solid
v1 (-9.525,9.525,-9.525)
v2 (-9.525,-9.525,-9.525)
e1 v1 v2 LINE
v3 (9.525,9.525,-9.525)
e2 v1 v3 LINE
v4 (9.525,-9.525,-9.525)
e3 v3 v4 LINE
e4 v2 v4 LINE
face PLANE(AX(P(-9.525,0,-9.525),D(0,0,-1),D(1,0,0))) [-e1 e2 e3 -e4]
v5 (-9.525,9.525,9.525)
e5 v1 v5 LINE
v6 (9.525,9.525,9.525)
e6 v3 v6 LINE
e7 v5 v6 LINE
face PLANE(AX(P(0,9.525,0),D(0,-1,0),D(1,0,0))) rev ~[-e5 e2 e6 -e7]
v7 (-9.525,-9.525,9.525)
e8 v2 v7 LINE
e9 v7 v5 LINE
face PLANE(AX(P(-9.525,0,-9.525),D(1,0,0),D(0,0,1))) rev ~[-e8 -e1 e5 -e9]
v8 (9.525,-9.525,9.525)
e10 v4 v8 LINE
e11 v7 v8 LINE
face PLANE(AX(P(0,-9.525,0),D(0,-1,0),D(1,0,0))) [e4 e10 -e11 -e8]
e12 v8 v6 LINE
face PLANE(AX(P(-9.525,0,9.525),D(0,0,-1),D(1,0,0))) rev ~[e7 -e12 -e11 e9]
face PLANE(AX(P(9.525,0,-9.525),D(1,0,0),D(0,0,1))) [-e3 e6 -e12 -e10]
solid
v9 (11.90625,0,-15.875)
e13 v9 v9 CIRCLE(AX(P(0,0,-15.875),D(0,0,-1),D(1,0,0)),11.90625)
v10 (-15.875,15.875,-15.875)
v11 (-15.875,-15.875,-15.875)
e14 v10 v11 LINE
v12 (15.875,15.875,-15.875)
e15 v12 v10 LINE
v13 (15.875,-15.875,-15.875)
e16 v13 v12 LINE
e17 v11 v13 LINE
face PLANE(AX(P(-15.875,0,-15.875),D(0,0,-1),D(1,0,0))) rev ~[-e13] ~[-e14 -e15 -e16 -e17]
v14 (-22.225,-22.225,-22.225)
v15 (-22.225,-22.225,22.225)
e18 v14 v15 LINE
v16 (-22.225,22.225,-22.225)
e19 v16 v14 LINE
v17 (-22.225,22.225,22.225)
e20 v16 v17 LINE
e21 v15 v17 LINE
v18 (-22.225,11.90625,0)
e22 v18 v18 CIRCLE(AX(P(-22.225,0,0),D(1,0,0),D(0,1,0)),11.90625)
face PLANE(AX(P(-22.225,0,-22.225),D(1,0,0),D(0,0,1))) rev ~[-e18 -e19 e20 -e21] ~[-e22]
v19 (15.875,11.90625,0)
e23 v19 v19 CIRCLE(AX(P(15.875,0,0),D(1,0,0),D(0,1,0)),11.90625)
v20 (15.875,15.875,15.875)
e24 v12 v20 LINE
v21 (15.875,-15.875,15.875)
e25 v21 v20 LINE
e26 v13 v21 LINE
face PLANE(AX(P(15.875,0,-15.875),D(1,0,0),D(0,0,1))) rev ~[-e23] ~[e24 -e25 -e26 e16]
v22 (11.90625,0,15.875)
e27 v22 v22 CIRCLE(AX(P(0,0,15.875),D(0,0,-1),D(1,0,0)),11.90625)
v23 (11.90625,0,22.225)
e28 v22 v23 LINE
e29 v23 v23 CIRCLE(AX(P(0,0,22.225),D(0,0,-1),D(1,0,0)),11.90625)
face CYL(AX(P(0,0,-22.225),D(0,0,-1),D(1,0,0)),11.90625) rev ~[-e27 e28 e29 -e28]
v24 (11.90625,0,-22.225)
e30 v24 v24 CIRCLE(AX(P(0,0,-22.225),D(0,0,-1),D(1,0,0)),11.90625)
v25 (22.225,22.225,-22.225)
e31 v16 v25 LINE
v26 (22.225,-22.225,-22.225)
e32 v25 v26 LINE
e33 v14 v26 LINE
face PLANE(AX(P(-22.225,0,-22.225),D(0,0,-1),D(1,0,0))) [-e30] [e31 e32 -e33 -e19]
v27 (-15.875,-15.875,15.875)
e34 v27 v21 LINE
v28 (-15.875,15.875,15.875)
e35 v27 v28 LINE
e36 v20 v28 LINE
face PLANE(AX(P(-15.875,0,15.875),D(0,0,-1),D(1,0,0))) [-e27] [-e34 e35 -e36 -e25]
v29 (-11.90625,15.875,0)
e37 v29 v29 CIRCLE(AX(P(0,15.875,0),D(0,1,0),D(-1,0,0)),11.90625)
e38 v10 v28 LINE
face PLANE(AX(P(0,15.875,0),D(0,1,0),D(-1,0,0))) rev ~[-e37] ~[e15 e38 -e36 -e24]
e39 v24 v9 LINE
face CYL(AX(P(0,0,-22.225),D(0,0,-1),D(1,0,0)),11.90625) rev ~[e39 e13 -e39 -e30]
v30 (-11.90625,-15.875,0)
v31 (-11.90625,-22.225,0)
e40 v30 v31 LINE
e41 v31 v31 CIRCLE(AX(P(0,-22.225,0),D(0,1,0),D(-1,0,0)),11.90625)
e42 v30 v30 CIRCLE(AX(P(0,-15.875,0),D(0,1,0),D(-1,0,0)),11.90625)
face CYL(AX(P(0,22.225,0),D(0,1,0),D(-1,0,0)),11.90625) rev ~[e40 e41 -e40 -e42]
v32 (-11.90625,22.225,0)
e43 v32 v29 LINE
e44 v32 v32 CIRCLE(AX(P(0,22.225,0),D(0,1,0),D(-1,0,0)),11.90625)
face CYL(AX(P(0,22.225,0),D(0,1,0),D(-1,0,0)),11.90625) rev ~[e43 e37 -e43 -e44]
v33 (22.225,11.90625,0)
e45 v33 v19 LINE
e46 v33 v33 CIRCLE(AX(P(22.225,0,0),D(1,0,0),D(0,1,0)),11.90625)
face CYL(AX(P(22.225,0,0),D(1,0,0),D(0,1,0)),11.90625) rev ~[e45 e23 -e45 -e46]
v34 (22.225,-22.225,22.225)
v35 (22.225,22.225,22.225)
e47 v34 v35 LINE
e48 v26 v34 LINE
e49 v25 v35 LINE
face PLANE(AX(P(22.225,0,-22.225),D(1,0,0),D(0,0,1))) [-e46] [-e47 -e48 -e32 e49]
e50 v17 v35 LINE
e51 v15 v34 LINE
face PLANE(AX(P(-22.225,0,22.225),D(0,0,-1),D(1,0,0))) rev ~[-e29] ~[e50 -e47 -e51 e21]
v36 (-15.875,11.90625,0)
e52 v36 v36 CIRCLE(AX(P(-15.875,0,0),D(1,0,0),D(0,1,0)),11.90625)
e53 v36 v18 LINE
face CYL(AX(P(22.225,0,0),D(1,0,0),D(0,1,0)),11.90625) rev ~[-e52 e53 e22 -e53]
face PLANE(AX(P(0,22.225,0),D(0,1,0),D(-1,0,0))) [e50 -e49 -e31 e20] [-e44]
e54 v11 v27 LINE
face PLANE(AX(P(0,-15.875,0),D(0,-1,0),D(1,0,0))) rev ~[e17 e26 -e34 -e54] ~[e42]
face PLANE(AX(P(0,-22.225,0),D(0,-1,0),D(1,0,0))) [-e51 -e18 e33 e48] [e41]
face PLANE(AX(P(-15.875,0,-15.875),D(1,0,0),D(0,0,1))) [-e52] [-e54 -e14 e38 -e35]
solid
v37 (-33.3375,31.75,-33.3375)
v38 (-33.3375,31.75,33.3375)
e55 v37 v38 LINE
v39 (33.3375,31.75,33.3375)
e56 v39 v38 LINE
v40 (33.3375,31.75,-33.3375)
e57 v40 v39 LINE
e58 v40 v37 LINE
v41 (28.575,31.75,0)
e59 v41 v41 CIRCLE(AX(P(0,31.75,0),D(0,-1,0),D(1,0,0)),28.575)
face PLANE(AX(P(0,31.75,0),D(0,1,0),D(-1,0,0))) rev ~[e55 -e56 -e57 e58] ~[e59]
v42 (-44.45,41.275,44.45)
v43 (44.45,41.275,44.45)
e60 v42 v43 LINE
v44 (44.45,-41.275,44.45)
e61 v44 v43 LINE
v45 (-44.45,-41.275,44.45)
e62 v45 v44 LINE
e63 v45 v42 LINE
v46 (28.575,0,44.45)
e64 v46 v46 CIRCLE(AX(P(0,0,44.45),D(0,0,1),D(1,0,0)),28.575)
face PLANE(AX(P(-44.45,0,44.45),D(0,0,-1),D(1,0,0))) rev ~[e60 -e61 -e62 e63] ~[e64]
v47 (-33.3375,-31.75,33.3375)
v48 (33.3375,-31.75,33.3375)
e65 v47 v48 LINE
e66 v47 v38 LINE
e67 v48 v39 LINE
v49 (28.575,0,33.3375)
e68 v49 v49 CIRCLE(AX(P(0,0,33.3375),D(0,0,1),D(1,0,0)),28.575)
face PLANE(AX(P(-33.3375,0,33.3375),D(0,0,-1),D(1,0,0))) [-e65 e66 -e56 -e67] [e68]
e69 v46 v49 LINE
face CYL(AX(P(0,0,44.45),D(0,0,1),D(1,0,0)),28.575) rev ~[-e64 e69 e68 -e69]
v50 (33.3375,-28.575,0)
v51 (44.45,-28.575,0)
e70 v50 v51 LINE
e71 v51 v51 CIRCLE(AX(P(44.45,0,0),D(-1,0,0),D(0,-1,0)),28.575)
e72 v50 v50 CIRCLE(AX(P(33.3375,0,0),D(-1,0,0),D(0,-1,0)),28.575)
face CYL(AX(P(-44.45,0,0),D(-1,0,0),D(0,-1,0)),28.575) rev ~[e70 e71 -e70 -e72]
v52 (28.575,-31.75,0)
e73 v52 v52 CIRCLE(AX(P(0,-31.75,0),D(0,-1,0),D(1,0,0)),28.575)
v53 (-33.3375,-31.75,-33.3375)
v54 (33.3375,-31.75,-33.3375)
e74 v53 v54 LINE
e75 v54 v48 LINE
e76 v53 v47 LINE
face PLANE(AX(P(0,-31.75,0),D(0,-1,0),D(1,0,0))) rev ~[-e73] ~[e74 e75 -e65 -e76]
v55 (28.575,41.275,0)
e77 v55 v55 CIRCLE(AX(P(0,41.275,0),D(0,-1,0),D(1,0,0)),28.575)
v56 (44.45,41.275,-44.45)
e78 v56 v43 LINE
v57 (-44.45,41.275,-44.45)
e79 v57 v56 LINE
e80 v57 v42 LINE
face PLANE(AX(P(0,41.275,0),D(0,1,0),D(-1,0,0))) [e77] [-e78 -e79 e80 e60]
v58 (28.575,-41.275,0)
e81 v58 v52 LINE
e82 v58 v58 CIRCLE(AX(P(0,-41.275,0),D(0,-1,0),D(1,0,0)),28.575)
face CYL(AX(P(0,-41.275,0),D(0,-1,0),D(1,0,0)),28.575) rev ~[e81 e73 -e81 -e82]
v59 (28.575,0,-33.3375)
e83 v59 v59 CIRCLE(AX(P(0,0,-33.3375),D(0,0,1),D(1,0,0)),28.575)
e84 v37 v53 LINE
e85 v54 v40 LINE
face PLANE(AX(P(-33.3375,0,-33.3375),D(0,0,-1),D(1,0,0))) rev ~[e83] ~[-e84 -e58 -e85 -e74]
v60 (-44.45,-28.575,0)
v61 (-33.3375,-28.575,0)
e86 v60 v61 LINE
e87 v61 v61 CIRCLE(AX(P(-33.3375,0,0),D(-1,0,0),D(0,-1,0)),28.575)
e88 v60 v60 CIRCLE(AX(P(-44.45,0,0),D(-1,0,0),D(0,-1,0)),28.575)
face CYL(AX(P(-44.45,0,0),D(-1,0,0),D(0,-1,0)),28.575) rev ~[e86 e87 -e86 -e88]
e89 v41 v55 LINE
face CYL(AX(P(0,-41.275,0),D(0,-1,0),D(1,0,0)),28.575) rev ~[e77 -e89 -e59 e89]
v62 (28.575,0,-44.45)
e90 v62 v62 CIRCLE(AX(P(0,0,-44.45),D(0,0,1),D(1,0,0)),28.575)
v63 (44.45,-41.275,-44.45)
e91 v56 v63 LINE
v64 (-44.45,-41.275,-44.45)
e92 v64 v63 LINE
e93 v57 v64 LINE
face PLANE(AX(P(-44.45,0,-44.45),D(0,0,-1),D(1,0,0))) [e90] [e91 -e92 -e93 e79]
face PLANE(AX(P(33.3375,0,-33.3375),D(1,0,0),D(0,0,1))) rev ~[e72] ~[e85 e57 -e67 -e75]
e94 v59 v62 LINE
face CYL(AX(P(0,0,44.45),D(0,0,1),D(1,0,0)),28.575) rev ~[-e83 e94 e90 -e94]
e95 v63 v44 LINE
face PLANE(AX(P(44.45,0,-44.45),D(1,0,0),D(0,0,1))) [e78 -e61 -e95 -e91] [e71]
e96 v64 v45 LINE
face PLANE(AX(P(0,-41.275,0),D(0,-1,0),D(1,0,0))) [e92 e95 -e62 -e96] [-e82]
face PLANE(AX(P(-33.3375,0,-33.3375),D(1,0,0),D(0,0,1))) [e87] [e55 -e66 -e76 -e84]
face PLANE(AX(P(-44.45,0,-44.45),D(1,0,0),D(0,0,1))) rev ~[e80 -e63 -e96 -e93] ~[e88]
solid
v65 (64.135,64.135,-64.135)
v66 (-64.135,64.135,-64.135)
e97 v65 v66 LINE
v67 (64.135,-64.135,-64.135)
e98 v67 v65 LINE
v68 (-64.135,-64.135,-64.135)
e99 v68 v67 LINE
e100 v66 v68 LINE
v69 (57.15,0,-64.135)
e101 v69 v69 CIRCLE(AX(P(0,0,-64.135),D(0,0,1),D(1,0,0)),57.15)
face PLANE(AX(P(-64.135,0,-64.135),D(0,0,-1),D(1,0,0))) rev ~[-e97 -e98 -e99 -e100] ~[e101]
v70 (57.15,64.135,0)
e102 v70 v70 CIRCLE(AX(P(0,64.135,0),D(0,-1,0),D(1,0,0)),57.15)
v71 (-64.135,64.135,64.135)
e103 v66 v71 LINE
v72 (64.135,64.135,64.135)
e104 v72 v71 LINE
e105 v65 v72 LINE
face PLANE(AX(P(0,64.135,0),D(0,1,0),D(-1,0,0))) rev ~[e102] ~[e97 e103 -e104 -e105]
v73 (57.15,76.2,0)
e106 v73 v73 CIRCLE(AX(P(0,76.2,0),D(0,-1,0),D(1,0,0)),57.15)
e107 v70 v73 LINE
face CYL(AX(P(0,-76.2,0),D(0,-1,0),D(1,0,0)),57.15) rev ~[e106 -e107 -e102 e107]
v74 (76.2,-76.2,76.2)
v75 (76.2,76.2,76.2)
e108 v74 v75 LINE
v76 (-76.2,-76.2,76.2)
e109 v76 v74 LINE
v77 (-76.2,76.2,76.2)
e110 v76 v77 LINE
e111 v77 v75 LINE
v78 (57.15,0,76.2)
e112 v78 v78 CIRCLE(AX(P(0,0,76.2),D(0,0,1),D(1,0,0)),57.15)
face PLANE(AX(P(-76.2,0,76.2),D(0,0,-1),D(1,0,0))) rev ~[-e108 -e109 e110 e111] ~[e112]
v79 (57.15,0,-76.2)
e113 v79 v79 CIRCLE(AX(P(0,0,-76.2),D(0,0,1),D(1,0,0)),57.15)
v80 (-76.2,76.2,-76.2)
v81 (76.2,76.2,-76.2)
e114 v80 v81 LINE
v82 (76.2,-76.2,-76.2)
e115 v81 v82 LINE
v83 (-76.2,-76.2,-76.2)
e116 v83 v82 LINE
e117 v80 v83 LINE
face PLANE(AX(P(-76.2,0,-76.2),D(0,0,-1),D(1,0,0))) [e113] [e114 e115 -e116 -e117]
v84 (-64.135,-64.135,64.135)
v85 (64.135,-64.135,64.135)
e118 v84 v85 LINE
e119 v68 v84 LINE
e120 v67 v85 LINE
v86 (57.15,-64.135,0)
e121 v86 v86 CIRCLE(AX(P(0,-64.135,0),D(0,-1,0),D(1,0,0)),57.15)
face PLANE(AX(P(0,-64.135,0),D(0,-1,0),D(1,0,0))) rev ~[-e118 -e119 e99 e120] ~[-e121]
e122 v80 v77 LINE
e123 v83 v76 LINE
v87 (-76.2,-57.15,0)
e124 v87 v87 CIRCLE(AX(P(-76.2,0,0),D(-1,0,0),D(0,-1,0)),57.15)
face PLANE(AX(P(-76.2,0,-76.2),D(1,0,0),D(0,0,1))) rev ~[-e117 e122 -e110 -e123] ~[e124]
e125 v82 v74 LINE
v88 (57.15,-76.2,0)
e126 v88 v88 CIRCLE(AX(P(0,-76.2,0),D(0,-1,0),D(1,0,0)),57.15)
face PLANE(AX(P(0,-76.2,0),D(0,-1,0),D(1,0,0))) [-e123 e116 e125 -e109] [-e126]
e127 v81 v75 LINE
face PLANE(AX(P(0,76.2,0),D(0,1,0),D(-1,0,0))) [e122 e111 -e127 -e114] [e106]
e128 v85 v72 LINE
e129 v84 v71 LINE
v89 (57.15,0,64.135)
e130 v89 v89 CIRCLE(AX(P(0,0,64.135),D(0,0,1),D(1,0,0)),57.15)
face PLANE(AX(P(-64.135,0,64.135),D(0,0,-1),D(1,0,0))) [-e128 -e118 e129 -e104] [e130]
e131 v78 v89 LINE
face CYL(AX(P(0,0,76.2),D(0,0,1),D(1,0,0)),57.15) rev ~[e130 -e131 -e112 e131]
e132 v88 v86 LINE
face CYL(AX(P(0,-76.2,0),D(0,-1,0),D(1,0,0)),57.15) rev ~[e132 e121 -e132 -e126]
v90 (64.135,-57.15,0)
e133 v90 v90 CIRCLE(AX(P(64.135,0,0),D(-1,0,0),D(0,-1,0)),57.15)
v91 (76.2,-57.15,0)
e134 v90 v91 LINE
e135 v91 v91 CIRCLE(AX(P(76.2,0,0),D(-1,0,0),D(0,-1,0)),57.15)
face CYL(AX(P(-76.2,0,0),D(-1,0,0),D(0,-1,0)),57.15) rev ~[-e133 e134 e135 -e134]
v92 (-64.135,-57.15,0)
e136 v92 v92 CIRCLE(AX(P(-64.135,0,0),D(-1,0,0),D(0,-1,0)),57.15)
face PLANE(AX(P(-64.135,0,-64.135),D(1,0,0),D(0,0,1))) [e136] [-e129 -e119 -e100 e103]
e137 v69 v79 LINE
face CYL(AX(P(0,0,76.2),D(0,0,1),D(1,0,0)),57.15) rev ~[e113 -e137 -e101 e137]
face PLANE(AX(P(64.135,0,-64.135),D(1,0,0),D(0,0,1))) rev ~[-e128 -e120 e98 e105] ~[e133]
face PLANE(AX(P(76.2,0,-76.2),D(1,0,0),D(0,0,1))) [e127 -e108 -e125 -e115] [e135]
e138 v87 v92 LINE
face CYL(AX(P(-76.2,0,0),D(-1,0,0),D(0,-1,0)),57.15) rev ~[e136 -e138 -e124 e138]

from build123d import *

# Parameters (mm, degrees)
F0_W      = 19.05
F0_H      = 19.05
F1_DEPTH  = 9.525
F2_W      = 44.45
F2_H      = 44.45
F2_W_2    = 31.75
F2_H_2    = 31.75
F3_DEPTH  = 22.225
F4_W      = 31.75
F4_H      = 31.75
F5_DEPTH  = 6.35
F6_W      = 31.75
F6_H      = 31.75
F7_DEPTH  = 6.35
F8_R      = 11.90625
F9_DEPTH  = 44.451
F10_R     = 11.90625
F11_DEPTH = 44.451
F12_R     = 11.90625
F13_DEPTH = 44.451
F14_W     = 88.9
F14_H     = 88.9
F14_W_2   = 66.675
F14_H_2   = 66.675
F15_DEPTH = 41.275
F16_W     = 66.675
F16_H     = 66.675
F17_DEPTH = 9.525
F18_W     = 66.675
F18_H     = 66.675
F19_DEPTH = 9.525
F20_R     = 28.575
F21_DEPTH = 82.551
F22_R     = 28.575
F23_DEPTH = 88.901
F24_R     = 28.575
F25_DEPTH = 88.901
F26_W     = 152.4
F26_H     = 152.4
F26_W_2   = 128.27
F26_H_2   = 128.27
F27_DEPTH = 76.2
F28_W     = 128.27
F28_H     = 128.27
F29_DEPTH = 12.065
F30_W     = 128.27
F30_H     = 128.27
F31_DEPTH = 12.065
F32_R     = 57.15
F33_DEPTH = 152.401
F34_R     = 57.15
F35_DEPTH = 152.401
F36_R     = 57.15
F37_DEPTH = 152.401


with BuildPart() as f1:
    # F0 (on Front) → F1 (new body, symmetric)
    with BuildSketch(Plane.XZ):
        Rectangle(F0_W, F0_H)
    extrude(amount=F1_DEPTH, both=True)


with BuildPart() as f3:
    # F2 (on Front) → F3 (new body, symmetric)
    with BuildSketch(Plane.XZ):
        Rectangle(F2_W, F2_H)
        Rectangle(F2_W_2, F2_H_2, mode=Mode.SUBTRACT)
    extrude(amount=F3_DEPTH, both=True)

    # F4 (on face) → F5 (join)
    with BuildSketch(Plane.XZ.offset(22.225)):
        Rectangle(F4_W, F4_H)
    extrude(amount=-F5_DEPTH)

    # F6 (on face) → F7 (join)
    with BuildSketch(Plane(origin=(0, 22.225, 0), x_dir=(-1, 0, 0), z_dir=(0, 1, 0))):
        Rectangle(F6_W, F6_H)
    extrude(amount=-F7_DEPTH)

    # F8 (on face) → F9 (cut, through all)
    with BuildSketch(Plane(origin=(0, 22.225, 0), x_dir=(-1, 0, 0), z_dir=(0, 1, 0))):
        Circle(F8_R)
    extrude(amount=-F9_DEPTH, mode=Mode.SUBTRACT)

    # F10 (on face) → F11 (cut, through all)
    with BuildSketch(Plane.YZ.offset(22.225)):
        Circle(F10_R)
    extrude(amount=-F11_DEPTH, mode=Mode.SUBTRACT)

    # F12 (on face) → F13 (cut, through all)
    with BuildSketch(Plane(origin=(0, 0, -22.225), x_dir=(1, 0, 0), z_dir=(0, 0, -1))):
        Circle(F12_R)
    extrude(amount=-F13_DEPTH, mode=Mode.SUBTRACT)


with BuildPart() as f15:
    # F14 (on Front) → F15 (new body, symmetric)
    with BuildSketch(Plane.XZ):
        Rectangle(F14_W, F14_H)
        Rectangle(F14_W_2, F14_H_2, mode=Mode.SUBTRACT)
    extrude(amount=F15_DEPTH, both=True)

    # F16 (on face) → F17 (join)
    with BuildSketch(Plane(origin=(0, 41.275, 0), x_dir=(-1, 0, 0), z_dir=(0, 1, 0))):
        Rectangle(F16_W, F16_H)
    extrude(amount=-F17_DEPTH)

    # F18 (on face) → F19 (join)
    with BuildSketch(Plane.XZ.offset(41.275)):
        Rectangle(F18_W, F18_H)
    extrude(amount=-F19_DEPTH)

    # F20 (on face) → F21 (cut, through all)
    with BuildSketch(Plane.XZ.offset(41.275)):
        Circle(F20_R)
    extrude(amount=-F21_DEPTH, mode=Mode.SUBTRACT)

    # F22 (on face) → F23 (cut, through all)
    with BuildSketch(Plane(origin=(-44.45, 0, 0), x_dir=(0, -1, 0), z_dir=(-1, 0, 0))):
        Circle(F22_R)
    extrude(amount=-F23_DEPTH, mode=Mode.SUBTRACT)

    # F24 (on face) → F25 (cut, through all)
    with BuildSketch(Plane.XY.offset(44.45)):
        Circle(F24_R)
    extrude(amount=-F25_DEPTH, mode=Mode.SUBTRACT)


with BuildPart() as f27:
    # F26 (on Front) → F27 (new body, symmetric)
    with BuildSketch(Plane.XZ):
        Rectangle(F26_W, F26_H)
        Rectangle(F26_W_2, F26_H_2, mode=Mode.SUBTRACT)
    extrude(amount=F27_DEPTH, both=True)

    # F28 (on face) → F29 (join)
    with BuildSketch(Plane.XZ.offset(76.2)):
        Rectangle(F28_W, F28_H)
    extrude(amount=-F29_DEPTH)

    # F30 (on face) → F31 (join)
    with BuildSketch(Plane(origin=(0, 76.2, 0), x_dir=(-1, 0, 0), z_dir=(0, 1, 0))):
        Rectangle(F30_W, F30_H)
    extrude(amount=-F31_DEPTH)

    # F32 (on face) → F33 (cut, through all)
    with BuildSketch(Plane.XZ.offset(76.2)):
        Circle(F32_R)
    extrude(amount=-F33_DEPTH, mode=Mode.SUBTRACT)

    # F34 (on face) → F35 (cut, through all)
    with BuildSketch(Plane(origin=(-76.2, 0, 0), x_dir=(0, -1, 0), z_dir=(-1, 0, 0))):
        Circle(F34_R)
    extrude(amount=-F35_DEPTH, mode=Mode.SUBTRACT)

    # F36 (on face) → F37 (cut, through all)
    with BuildSketch(Plane.XY.offset(76.2)):
        Circle(F36_R)
    extrude(amount=-F37_DEPTH, mode=Mode.SUBTRACT)


solid = Compound([f1.part, f3.part, f15.part, f27.part])
